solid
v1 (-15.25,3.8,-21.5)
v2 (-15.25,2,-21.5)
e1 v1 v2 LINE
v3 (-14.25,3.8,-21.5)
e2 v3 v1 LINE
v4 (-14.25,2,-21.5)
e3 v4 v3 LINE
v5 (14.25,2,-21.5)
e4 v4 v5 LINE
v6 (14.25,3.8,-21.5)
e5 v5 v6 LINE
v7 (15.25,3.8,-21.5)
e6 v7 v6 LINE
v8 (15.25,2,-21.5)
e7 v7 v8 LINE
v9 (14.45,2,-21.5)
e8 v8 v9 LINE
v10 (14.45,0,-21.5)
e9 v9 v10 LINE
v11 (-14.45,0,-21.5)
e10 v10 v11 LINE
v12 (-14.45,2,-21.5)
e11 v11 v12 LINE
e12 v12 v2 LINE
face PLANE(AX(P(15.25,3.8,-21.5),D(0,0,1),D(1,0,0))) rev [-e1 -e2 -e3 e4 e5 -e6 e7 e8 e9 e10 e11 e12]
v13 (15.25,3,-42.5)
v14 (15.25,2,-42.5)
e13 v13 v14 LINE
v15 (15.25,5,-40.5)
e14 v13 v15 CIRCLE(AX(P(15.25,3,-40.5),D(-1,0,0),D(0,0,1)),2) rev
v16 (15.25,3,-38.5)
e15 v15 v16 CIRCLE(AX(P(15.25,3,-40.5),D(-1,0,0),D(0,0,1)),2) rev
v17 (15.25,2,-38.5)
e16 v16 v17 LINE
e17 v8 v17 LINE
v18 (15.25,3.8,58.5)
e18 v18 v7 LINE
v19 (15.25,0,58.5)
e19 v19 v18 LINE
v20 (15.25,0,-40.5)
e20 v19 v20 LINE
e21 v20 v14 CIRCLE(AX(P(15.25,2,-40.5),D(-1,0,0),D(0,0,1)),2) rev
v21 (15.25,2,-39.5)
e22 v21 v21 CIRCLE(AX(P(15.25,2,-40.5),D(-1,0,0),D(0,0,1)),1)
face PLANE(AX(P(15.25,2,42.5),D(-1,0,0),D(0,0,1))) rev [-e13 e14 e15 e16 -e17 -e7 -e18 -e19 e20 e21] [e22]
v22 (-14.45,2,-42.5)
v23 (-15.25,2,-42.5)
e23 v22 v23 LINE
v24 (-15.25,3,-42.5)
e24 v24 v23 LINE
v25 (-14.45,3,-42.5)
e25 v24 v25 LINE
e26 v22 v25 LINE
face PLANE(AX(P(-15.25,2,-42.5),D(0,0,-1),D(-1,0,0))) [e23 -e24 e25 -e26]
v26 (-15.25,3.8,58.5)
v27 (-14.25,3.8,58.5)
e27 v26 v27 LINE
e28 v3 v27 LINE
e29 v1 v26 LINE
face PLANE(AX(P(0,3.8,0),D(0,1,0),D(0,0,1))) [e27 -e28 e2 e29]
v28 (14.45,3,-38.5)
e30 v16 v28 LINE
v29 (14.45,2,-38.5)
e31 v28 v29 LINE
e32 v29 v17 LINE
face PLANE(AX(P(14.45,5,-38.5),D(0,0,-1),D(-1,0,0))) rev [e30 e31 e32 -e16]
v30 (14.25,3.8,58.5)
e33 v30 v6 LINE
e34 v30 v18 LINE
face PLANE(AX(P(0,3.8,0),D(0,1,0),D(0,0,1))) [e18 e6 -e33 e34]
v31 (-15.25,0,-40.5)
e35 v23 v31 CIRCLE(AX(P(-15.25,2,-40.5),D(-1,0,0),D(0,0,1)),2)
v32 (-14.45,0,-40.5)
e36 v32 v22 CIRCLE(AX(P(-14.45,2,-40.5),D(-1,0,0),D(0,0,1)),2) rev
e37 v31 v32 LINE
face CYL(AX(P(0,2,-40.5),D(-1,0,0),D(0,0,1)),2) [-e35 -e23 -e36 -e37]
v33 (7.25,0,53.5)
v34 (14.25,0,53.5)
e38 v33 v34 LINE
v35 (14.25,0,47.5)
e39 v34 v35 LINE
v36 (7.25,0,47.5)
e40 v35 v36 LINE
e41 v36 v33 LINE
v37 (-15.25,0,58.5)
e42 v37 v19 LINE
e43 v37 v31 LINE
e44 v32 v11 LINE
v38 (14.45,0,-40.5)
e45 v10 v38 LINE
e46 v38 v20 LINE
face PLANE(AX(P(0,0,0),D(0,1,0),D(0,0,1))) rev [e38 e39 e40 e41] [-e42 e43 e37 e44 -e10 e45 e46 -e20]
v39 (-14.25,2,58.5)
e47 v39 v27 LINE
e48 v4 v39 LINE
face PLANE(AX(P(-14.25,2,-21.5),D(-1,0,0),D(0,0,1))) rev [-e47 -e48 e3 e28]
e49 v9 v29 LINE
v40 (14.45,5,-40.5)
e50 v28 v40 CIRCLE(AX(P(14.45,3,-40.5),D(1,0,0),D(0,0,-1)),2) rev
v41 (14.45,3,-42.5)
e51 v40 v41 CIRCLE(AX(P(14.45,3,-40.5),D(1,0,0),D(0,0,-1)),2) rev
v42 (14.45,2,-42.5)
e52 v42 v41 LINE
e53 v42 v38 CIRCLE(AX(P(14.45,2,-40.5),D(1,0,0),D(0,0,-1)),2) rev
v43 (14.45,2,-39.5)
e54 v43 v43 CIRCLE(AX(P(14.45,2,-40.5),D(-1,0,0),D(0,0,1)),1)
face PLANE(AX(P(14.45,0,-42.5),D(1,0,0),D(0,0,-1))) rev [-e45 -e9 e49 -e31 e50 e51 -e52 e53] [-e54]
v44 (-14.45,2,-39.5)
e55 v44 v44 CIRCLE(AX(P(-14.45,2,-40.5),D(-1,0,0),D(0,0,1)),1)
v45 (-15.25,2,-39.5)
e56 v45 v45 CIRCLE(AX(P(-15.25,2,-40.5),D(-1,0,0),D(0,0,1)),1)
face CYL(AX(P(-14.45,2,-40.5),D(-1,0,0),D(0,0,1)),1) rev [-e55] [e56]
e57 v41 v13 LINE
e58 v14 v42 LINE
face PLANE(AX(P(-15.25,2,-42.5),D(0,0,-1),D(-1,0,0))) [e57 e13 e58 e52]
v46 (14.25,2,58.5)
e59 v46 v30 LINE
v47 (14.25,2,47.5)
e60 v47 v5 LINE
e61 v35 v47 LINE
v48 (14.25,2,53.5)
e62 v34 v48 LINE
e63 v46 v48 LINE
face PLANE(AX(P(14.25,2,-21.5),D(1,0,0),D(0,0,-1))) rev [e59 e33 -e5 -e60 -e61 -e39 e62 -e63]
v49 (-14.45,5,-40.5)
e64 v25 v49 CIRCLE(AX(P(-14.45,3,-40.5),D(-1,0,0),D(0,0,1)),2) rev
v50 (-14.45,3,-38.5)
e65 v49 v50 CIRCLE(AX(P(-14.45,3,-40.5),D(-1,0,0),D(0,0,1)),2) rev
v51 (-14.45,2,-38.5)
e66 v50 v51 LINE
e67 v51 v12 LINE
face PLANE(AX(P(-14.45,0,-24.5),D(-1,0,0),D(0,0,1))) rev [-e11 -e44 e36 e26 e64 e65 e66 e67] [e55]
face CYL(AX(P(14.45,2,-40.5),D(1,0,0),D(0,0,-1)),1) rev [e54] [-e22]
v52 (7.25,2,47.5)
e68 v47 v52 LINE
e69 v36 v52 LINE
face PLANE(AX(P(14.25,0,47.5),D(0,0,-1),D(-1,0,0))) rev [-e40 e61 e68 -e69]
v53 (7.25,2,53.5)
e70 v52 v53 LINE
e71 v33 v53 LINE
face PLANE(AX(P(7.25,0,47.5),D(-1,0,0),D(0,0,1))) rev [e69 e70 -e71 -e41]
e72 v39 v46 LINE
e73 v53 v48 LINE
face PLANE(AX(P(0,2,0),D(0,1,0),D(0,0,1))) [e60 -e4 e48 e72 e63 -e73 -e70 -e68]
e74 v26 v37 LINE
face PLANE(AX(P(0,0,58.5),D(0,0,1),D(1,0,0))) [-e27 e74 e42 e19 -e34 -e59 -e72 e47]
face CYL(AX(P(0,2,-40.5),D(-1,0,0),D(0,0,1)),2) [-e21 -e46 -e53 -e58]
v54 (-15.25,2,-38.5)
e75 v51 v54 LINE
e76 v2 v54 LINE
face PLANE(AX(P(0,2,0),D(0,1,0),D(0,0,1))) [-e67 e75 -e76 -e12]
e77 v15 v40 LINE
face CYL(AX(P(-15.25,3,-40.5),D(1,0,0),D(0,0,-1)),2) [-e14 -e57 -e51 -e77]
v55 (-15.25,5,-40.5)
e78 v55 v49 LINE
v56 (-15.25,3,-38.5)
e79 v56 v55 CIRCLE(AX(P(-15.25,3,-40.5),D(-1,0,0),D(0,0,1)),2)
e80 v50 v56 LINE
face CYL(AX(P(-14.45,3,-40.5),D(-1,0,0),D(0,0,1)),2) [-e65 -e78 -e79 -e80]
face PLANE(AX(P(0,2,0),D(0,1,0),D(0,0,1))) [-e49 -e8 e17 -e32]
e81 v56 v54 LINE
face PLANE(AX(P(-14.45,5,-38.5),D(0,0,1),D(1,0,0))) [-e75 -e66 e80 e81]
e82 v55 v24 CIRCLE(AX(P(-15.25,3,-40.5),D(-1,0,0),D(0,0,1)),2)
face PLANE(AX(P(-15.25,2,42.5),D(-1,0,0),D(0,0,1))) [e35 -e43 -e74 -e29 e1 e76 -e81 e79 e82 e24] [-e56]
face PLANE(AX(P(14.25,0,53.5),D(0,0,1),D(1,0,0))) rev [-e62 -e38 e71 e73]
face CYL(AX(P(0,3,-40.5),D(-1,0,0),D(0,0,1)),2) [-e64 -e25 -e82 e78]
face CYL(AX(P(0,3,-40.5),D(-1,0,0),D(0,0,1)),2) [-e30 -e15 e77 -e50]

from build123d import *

# Parameters (mm, degrees)
SKETCH1_W           = 30.5
SKETCH1_H           = 85
BOSS_EXTRUDE1_DEPTH = 2
CUT_EXTRUDE1_DEPTH  = 2
SKETCH5_W           = 0.8
SKETCH5_H           = 4
BOSS_EXTRUDE2_DEPTH = 3
SKETCH6_R           = 1
CUT_EXTRUDE2_DEPTH  = 0.8
FILLET1_R           = 2
FILLET2_R           = 2
SKETCH7_W           = 30.5
SKETCH7_H           = 2
BOSS_EXTRUDE3_DEPTH = 16
SKETCH8_W           = 30.5
SKETCH8_H           = 80
BOSS_EXTRUDE4_DEPTH = 1.8
SKETCH9_W           = 28.5
SKETCH9_H           = 80
CUT_EXTRUDE3_DEPTH  = 1.8
SKETCH10_W          = 28.9
SKETCH10_H          = 2
CUT_EXTRUDE4_DEPTH  = 1
SKETCH11_W          = 7
SKETCH11_H          = 6
CUT_EXTRUDE5_DEPTH  = 2


with BuildPart() as part:
    # Sketch1 → Boss-Extrude1 (new body)
    with BuildSketch(Plane(origin=(0, 0, 0), x_dir=(1, 0, 0), z_dir=(0, 1, 0))):
        Rectangle(SKETCH1_W, SKETCH1_H)
    extrude(amount=BOSS_EXTRUDE1_DEPTH)

    # Sketch2 → Cut-Extrude1 (cut)
    with BuildSketch(Plane(origin=(0, 2, 0), x_dir=(1, 0, 0), z_dir=(0, 1, 0))):
        Polygon((14.45, 42.5), (-14.45, 42.5), (-14.45, 24.5), (-14.45, 22.5), (14.45, 22.5), (14.45, 24.5), align=None)
    extrude(amount=-CUT_EXTRUDE1_DEPTH, mode=Mode.SUBTRACT)

    # Sketch5 → Boss-Extrude2 (add)
    with BuildSketch(Plane(origin=(0, 2, 0), x_dir=(1, 0, 0), z_dir=(0, 1, 0))):
        with Locations((-14.85, 40.5)):
            Rectangle(SKETCH5_W, SKETCH5_H)
    boss_extrude2 = extrude(amount=BOSS_EXTRUDE2_DEPTH)

    # Sketch6 → Cut-Extrude2 (cut)
    with BuildSketch(Plane.ZY.offset(15.25)):
        with Locations((-40.5, 2)):
            Circle(SKETCH6_R)
    cut_extrude2 = extrude(amount=-CUT_EXTRUDE2_DEPTH, mode=Mode.SUBTRACT)

    # Mirror1: Boss-Extrude2, Cut-Extrude2 across plane
    add(boss_extrude2.mirror(Plane(origin=(0, 0, 0), x_dir=(0, 0, 1), z_dir=(1, 0, 0))))
    add(cut_extrude2.mirror(Plane(origin=(0, 0, 0), x_dir=(0, 0, 1), z_dir=(1, 0, 0))), mode=Mode.SUBTRACT)

    # Fillet1
    fillet1_edges = [part.edges().sort_by_distance(p)[0] for p in [
        (-14.85, 0, -42.5),
        (-14.85, 5, -42.5),
        (-14.85, 5, -38.5),
    ]]
    fillet(fillet1_edges, radius=FILLET1_R - 0.0001)  # a hair under: the kernel refuses the full size

    # Fillet2
    fillet2_edges = [part.edges().sort_by_distance(p)[0] for p in [
        (14.85, 0, -42.5),
        (14.85, 5, -38.5),
        (14.85, 5, -42.5),
    ]]
    fillet(fillet2_edges, radius=FILLET2_R - 0.0001)  # a hair under: the kernel refuses the full size

    # Sketch7 → Boss-Extrude3 (add)
    with BuildSketch(Plane.XY.offset(42.5)):
        with Locations((0, 1)):
            Rectangle(SKETCH7_W, SKETCH7_H)
    extrude(amount=BOSS_EXTRUDE3_DEPTH)

    # Sketch8 → Boss-Extrude4 (add)
    with BuildSketch(Plane(origin=(0, 2, 0), x_dir=(1, 0, 0), z_dir=(0, 1, 0))):
        with Locations((0, -18.5)):
            Rectangle(SKETCH8_W, SKETCH8_H)
    extrude(amount=BOSS_EXTRUDE4_DEPTH)

    # Sketch9 → Cut-Extrude3 (cut)
    with BuildSketch(Plane(origin=(0, 3.8, 0), x_dir=(1, 0, 0), z_dir=(0, 1, 0))):
        with Locations((0, -18.5)):
            Rectangle(SKETCH9_W, SKETCH9_H)
    extrude(amount=-CUT_EXTRUDE3_DEPTH, mode=Mode.SUBTRACT)

    # Sketch10 → Cut-Extrude4 (cut)
    with BuildSketch(Plane(origin=(0, 0, -22.5), x_dir=(-1, 0, 0), z_dir=(0, 0, -1))):
        with Locations((0, 1)):
            Rectangle(SKETCH10_W, SKETCH10_H)
    extrude(amount=-CUT_EXTRUDE4_DEPTH, mode=Mode.SUBTRACT)

    # Sketch11 → Cut-Extrude5 (cut)
    with BuildSketch(Plane(origin=(0, 2, 0), x_dir=(1, 0, 0), z_dir=(0, 1, 0))):
        with Locations((10.75, -50.5)):
            Rectangle(SKETCH11_W, SKETCH11_H)
    extrude(amount=-CUT_EXTRUDE5_DEPTH, mode=Mode.SUBTRACT)


solid = part.part
